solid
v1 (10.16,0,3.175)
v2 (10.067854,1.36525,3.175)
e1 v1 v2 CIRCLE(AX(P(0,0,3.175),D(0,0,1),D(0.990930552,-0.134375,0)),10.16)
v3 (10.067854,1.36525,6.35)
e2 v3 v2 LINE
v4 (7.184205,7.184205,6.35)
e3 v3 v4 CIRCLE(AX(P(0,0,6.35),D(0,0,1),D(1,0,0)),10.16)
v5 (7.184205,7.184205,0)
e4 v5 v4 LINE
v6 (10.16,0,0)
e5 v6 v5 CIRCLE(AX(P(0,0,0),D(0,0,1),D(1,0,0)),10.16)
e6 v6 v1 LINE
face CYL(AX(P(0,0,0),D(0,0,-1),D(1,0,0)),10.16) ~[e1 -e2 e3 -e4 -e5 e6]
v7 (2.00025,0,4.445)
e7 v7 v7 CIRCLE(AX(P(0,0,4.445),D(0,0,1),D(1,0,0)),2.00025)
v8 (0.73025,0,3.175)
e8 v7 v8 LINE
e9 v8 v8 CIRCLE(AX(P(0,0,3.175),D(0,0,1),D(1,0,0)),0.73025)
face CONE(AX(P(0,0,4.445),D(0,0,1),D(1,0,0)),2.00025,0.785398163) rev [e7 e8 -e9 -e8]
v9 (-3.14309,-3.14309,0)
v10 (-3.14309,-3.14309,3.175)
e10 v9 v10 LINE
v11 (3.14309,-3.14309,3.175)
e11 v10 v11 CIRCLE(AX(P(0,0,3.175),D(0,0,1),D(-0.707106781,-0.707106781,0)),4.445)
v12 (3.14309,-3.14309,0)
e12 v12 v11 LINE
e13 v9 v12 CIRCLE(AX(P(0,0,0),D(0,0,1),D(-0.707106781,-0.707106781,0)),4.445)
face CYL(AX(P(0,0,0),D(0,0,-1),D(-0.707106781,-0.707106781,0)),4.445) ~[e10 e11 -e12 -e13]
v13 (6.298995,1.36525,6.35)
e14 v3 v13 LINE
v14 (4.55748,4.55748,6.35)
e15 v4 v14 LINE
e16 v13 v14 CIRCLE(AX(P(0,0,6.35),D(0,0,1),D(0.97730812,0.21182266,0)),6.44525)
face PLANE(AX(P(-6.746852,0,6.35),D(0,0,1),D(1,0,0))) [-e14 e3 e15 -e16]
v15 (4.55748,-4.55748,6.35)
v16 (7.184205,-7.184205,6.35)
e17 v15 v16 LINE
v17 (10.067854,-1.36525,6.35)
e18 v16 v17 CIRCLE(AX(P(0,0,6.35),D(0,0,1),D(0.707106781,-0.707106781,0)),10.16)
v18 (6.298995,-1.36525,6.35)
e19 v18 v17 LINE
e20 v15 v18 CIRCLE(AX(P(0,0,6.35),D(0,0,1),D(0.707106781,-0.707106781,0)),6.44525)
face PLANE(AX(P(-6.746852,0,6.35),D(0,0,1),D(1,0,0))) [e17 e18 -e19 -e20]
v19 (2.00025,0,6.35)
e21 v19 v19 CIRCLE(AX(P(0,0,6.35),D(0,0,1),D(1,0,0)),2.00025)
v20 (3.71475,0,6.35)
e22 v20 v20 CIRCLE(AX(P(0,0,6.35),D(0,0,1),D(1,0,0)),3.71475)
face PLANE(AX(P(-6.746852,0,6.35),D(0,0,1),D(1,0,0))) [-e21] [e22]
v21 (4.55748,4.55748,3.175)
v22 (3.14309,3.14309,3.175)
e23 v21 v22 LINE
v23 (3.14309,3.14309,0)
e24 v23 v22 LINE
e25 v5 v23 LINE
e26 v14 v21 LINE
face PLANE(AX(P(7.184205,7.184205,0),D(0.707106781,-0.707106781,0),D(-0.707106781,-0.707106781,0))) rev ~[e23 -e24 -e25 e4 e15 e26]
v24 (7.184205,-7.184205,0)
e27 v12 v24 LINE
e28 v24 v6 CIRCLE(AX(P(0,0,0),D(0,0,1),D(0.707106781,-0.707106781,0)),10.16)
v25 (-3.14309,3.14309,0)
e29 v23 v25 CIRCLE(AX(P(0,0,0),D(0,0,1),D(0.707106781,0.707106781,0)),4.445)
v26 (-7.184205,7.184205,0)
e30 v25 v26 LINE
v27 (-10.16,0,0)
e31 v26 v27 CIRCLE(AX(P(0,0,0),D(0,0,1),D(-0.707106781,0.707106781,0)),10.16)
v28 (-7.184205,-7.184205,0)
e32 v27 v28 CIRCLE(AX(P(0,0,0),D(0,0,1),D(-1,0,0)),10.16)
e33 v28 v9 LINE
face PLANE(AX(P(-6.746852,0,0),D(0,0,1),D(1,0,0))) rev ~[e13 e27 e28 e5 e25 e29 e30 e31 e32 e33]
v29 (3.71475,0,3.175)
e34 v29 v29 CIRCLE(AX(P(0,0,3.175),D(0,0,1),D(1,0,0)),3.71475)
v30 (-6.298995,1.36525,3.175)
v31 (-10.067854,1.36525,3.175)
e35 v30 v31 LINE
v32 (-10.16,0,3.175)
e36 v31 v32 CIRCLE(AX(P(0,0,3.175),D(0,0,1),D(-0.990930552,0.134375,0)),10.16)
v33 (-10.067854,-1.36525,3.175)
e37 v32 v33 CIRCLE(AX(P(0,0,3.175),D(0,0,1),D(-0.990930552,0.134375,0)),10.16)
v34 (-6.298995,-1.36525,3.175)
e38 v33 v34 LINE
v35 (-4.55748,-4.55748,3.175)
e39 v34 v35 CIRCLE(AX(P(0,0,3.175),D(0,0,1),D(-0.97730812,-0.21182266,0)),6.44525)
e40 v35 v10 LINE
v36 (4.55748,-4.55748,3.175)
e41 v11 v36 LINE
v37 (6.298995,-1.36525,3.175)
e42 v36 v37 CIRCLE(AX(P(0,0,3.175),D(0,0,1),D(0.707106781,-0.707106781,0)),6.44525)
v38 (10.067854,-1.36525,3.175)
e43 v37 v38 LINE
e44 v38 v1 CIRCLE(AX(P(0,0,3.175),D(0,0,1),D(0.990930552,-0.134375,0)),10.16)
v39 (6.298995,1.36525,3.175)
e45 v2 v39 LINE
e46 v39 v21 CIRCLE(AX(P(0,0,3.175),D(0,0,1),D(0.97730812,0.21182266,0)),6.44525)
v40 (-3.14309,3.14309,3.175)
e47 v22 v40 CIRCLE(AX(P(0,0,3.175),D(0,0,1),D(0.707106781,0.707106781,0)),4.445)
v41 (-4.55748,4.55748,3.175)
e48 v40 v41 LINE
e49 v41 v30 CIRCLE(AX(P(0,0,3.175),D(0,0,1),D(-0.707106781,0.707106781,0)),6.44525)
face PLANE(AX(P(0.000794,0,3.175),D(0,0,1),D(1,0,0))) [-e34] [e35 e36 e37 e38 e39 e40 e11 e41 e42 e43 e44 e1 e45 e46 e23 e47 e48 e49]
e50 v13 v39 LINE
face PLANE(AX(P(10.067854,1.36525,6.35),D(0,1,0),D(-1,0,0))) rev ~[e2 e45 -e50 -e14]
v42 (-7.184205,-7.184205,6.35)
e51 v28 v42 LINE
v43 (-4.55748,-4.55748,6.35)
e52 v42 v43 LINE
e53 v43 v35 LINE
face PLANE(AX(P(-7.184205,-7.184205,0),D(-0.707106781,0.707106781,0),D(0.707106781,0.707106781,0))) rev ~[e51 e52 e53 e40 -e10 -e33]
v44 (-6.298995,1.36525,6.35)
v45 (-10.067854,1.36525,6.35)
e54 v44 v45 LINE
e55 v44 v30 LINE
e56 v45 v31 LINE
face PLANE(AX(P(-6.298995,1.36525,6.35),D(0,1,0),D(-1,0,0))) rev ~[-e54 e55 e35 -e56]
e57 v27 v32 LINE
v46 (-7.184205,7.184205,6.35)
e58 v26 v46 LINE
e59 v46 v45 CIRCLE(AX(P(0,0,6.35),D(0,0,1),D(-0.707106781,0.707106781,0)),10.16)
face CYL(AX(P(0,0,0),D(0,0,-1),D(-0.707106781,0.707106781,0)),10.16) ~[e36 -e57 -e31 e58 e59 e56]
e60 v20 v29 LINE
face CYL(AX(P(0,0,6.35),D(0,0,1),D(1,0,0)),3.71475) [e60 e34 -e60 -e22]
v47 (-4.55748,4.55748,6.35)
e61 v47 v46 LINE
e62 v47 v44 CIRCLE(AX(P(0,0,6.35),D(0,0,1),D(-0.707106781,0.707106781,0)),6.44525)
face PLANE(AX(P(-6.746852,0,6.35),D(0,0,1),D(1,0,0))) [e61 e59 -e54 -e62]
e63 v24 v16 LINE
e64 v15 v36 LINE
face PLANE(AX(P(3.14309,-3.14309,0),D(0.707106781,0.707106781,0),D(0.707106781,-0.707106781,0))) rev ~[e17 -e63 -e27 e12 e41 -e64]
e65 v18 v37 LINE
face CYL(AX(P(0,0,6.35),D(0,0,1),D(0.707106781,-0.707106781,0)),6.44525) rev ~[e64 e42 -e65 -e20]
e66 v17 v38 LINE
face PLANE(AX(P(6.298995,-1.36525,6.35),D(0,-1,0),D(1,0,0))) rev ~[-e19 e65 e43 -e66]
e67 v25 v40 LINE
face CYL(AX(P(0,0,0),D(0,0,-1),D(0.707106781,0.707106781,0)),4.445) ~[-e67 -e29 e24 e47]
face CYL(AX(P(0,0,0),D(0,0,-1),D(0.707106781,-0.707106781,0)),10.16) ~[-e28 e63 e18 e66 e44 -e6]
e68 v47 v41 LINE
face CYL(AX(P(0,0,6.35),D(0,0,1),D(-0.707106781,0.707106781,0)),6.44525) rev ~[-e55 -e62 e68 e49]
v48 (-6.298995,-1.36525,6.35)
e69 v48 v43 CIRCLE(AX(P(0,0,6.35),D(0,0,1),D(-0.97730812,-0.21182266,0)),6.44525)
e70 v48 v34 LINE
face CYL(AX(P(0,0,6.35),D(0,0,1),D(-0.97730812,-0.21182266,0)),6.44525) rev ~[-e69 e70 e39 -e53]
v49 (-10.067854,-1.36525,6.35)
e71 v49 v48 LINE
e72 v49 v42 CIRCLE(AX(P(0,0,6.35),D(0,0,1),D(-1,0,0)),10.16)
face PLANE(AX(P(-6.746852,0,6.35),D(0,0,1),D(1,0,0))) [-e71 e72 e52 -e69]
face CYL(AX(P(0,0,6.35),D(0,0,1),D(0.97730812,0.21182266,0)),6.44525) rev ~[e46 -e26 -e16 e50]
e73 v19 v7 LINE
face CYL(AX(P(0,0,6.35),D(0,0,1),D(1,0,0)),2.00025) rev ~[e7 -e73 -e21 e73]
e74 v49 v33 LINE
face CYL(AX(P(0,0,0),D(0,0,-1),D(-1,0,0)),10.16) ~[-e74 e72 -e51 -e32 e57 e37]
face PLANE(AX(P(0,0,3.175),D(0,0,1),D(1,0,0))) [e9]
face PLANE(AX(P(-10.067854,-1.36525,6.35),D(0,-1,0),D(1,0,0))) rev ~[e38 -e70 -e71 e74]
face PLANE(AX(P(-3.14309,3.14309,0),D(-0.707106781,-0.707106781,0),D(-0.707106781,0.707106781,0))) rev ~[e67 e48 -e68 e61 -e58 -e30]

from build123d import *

# Parameters (mm, degrees)
F0_R     = 3.07975
F1_DEPTH = 6.35
F2_R     = 3.71475
F2_R_2   = 2.00025
F3_DEPTH = 3.175
F4_SIZE  = 1.27


# Not quite as in the source:
# - a feature names something its author has since deleted; it is built from what else it names


with BuildPart() as f1:
    # F0 (on Top) → F1 (new body)
    with BuildSketch(Plane.XY):
        with BuildLine():
            ThreePointArc((-4.445, 0), (-4.106644522, 1.7010278569), (-3.1430896424, 3.1430896424))
            Line((-3.1430896424, 3.1430896424), (-7.1842048969, 7.1842048969))
            ThreePointArc((-7.1842048969, 7.1842048969), (-9.3866160503, 3.8880636728), (-10.16, 0))
            ThreePointArc((-10.16, 0), (-9.3866160503, -3.8880636728), (-7.1842048969, -7.1842048969))
            Line((-7.1842048969, -7.1842048969), (-3.1430896424, -3.1430896424))
            ThreePointArc((-3.1430896424, -3.1430896424), (-4.106644522, -1.7010278569), (-4.445, 0))
        make_face()
        with BuildLine():
            ThreePointArc((3.1430896424, -3.1430896424), (4.106644522, -1.7010278569), (4.445, 0))
            ThreePointArc((4.445, 0), (4.106644522, 1.7010278569), (3.1430896424, 3.1430896424))
            ThreePointArc((3.1430896424, 3.1430896424), (0, 4.445), (-3.1430896424, 3.1430896424))
            ThreePointArc((-3.1430896424, 3.1430896424), (-4.106644522, 1.7010278569), (-4.445, 0))
            ThreePointArc((-4.445, 0), (-4.106644522, -1.7010278569), (-3.1430896424, -3.1430896424))
            ThreePointArc((-3.1430896424, -3.1430896424), (0, -4.445), (3.1430896424, -3.1430896424))
        make_face()
        Circle(F0_R, mode=Mode.SUBTRACT)
        with BuildLine():
            ThreePointArc((3.1430896424, 3.1430896424), (4.106644522, 1.7010278569), (4.445, 0))
            ThreePointArc((4.445, 0), (4.106644522, -1.7010278569), (3.1430896424, -3.1430896424))
            Line((3.1430896424, -3.1430896424), (7.1842048969, -7.1842048969))
            ThreePointArc((7.1842048969, -7.1842048969), (9.3866160503, -3.8880636728), (10.16, 0))
            ThreePointArc((10.16, 0), (9.3866160503, 3.8880636728), (7.1842048969, 7.1842048969))
            Line((7.1842048969, 7.1842048969), (3.1430896424, 3.1430896424))
        make_face()
        Circle(F0_R)
    extrude(amount=F1_DEPTH)

    # F2 (on face) → F3 (cut)
    with BuildSketch(Plane.XY.offset(6.35)):
        with BuildLine():
            ThreePointArc((6.298995158, -1.36525), (6.4085819845, -0.6865307789), (6.44525, 0))
            ThreePointArc((6.44525, 0), (6.4085819845, 0.6865307789), (6.298995158, 1.36525))
            ThreePointArc((6.298995158, 1.36525), (5.658033773, 3.0867298855), (4.5574799814, 4.5574799814))
            Line((4.5574799814, 4.5574799814), (3.1430896424, 3.1430896424))
            ThreePointArc((3.1430896424, 3.1430896424), (0, 4.445), (-3.1430896424, 3.1430896424))
            Line((-3.1430896424, 3.1430896424), (-4.5574799814, 4.5574799814))
            ThreePointArc((-4.5574799814, 4.5574799814), (-5.658033773, 3.0867298855), (-6.298995158, 1.36525))
            ThreePointArc((-6.298995158, 1.36525), (-6.44525, 0), (-6.298995158, -1.36525))
            ThreePointArc((-6.298995158, -1.36525), (-5.658033773, -3.0867298855), (-4.5574799814, -4.5574799814))
            Line((-4.5574799814, -4.5574799814), (-3.1430896424, -3.1430896424))
            ThreePointArc((-3.1430896424, -3.1430896424), (0, -4.445), (3.1430896424, -3.1430896424))
            Line((3.1430896424, -3.1430896424), (4.5574799814, -4.5574799814))
            ThreePointArc((4.5574799814, -4.5574799814), (5.658033773, -3.0867298855), (6.298995158, -1.36525))
        make_face()
        Circle(F2_R, mode=Mode.SUBTRACT)
        with BuildLine():
            ThreePointArc((6.298995158, 1.36525), (6.4085819845, 0.6865307789), (6.44525, 0))
            ThreePointArc((6.44525, 0), (6.4085819845, -0.6865307789), (6.298995158, -1.36525))
            Line((6.298995158, -1.36525), (10.0678544108, -1.36525))
            ThreePointArc((10.0678544108, -1.36525), (10.16, 0), (10.0678544108, 1.36525))
            Line((10.0678544108, 1.36525), (6.298995158, 1.36525))
        make_face()
        with BuildLine():
            ThreePointArc((-6.298995158, -1.36525), (-6.44525, 0), (-6.298995158, 1.36525))
            Line((-6.298995158, 1.36525), (-10.0678544108, 1.36525))
            ThreePointArc((-10.0678544108, 1.36525), (-10.16, 0), (-10.0678544108, -1.36525))
            Line((-10.0678544108, -1.36525), (-6.298995158, -1.36525))
        make_face()
        Circle(F2_R_2)
    extrude(amount=-F3_DEPTH, mode=Mode.SUBTRACT)

    # F4
    f4_edges = [f1.edges().sort_by_distance(p)[0] for p in [
        (-2.00025, 0, 3.175),
    ]]
    chamfer(f4_edges, length=F4_SIZE)


solid = f1.part
